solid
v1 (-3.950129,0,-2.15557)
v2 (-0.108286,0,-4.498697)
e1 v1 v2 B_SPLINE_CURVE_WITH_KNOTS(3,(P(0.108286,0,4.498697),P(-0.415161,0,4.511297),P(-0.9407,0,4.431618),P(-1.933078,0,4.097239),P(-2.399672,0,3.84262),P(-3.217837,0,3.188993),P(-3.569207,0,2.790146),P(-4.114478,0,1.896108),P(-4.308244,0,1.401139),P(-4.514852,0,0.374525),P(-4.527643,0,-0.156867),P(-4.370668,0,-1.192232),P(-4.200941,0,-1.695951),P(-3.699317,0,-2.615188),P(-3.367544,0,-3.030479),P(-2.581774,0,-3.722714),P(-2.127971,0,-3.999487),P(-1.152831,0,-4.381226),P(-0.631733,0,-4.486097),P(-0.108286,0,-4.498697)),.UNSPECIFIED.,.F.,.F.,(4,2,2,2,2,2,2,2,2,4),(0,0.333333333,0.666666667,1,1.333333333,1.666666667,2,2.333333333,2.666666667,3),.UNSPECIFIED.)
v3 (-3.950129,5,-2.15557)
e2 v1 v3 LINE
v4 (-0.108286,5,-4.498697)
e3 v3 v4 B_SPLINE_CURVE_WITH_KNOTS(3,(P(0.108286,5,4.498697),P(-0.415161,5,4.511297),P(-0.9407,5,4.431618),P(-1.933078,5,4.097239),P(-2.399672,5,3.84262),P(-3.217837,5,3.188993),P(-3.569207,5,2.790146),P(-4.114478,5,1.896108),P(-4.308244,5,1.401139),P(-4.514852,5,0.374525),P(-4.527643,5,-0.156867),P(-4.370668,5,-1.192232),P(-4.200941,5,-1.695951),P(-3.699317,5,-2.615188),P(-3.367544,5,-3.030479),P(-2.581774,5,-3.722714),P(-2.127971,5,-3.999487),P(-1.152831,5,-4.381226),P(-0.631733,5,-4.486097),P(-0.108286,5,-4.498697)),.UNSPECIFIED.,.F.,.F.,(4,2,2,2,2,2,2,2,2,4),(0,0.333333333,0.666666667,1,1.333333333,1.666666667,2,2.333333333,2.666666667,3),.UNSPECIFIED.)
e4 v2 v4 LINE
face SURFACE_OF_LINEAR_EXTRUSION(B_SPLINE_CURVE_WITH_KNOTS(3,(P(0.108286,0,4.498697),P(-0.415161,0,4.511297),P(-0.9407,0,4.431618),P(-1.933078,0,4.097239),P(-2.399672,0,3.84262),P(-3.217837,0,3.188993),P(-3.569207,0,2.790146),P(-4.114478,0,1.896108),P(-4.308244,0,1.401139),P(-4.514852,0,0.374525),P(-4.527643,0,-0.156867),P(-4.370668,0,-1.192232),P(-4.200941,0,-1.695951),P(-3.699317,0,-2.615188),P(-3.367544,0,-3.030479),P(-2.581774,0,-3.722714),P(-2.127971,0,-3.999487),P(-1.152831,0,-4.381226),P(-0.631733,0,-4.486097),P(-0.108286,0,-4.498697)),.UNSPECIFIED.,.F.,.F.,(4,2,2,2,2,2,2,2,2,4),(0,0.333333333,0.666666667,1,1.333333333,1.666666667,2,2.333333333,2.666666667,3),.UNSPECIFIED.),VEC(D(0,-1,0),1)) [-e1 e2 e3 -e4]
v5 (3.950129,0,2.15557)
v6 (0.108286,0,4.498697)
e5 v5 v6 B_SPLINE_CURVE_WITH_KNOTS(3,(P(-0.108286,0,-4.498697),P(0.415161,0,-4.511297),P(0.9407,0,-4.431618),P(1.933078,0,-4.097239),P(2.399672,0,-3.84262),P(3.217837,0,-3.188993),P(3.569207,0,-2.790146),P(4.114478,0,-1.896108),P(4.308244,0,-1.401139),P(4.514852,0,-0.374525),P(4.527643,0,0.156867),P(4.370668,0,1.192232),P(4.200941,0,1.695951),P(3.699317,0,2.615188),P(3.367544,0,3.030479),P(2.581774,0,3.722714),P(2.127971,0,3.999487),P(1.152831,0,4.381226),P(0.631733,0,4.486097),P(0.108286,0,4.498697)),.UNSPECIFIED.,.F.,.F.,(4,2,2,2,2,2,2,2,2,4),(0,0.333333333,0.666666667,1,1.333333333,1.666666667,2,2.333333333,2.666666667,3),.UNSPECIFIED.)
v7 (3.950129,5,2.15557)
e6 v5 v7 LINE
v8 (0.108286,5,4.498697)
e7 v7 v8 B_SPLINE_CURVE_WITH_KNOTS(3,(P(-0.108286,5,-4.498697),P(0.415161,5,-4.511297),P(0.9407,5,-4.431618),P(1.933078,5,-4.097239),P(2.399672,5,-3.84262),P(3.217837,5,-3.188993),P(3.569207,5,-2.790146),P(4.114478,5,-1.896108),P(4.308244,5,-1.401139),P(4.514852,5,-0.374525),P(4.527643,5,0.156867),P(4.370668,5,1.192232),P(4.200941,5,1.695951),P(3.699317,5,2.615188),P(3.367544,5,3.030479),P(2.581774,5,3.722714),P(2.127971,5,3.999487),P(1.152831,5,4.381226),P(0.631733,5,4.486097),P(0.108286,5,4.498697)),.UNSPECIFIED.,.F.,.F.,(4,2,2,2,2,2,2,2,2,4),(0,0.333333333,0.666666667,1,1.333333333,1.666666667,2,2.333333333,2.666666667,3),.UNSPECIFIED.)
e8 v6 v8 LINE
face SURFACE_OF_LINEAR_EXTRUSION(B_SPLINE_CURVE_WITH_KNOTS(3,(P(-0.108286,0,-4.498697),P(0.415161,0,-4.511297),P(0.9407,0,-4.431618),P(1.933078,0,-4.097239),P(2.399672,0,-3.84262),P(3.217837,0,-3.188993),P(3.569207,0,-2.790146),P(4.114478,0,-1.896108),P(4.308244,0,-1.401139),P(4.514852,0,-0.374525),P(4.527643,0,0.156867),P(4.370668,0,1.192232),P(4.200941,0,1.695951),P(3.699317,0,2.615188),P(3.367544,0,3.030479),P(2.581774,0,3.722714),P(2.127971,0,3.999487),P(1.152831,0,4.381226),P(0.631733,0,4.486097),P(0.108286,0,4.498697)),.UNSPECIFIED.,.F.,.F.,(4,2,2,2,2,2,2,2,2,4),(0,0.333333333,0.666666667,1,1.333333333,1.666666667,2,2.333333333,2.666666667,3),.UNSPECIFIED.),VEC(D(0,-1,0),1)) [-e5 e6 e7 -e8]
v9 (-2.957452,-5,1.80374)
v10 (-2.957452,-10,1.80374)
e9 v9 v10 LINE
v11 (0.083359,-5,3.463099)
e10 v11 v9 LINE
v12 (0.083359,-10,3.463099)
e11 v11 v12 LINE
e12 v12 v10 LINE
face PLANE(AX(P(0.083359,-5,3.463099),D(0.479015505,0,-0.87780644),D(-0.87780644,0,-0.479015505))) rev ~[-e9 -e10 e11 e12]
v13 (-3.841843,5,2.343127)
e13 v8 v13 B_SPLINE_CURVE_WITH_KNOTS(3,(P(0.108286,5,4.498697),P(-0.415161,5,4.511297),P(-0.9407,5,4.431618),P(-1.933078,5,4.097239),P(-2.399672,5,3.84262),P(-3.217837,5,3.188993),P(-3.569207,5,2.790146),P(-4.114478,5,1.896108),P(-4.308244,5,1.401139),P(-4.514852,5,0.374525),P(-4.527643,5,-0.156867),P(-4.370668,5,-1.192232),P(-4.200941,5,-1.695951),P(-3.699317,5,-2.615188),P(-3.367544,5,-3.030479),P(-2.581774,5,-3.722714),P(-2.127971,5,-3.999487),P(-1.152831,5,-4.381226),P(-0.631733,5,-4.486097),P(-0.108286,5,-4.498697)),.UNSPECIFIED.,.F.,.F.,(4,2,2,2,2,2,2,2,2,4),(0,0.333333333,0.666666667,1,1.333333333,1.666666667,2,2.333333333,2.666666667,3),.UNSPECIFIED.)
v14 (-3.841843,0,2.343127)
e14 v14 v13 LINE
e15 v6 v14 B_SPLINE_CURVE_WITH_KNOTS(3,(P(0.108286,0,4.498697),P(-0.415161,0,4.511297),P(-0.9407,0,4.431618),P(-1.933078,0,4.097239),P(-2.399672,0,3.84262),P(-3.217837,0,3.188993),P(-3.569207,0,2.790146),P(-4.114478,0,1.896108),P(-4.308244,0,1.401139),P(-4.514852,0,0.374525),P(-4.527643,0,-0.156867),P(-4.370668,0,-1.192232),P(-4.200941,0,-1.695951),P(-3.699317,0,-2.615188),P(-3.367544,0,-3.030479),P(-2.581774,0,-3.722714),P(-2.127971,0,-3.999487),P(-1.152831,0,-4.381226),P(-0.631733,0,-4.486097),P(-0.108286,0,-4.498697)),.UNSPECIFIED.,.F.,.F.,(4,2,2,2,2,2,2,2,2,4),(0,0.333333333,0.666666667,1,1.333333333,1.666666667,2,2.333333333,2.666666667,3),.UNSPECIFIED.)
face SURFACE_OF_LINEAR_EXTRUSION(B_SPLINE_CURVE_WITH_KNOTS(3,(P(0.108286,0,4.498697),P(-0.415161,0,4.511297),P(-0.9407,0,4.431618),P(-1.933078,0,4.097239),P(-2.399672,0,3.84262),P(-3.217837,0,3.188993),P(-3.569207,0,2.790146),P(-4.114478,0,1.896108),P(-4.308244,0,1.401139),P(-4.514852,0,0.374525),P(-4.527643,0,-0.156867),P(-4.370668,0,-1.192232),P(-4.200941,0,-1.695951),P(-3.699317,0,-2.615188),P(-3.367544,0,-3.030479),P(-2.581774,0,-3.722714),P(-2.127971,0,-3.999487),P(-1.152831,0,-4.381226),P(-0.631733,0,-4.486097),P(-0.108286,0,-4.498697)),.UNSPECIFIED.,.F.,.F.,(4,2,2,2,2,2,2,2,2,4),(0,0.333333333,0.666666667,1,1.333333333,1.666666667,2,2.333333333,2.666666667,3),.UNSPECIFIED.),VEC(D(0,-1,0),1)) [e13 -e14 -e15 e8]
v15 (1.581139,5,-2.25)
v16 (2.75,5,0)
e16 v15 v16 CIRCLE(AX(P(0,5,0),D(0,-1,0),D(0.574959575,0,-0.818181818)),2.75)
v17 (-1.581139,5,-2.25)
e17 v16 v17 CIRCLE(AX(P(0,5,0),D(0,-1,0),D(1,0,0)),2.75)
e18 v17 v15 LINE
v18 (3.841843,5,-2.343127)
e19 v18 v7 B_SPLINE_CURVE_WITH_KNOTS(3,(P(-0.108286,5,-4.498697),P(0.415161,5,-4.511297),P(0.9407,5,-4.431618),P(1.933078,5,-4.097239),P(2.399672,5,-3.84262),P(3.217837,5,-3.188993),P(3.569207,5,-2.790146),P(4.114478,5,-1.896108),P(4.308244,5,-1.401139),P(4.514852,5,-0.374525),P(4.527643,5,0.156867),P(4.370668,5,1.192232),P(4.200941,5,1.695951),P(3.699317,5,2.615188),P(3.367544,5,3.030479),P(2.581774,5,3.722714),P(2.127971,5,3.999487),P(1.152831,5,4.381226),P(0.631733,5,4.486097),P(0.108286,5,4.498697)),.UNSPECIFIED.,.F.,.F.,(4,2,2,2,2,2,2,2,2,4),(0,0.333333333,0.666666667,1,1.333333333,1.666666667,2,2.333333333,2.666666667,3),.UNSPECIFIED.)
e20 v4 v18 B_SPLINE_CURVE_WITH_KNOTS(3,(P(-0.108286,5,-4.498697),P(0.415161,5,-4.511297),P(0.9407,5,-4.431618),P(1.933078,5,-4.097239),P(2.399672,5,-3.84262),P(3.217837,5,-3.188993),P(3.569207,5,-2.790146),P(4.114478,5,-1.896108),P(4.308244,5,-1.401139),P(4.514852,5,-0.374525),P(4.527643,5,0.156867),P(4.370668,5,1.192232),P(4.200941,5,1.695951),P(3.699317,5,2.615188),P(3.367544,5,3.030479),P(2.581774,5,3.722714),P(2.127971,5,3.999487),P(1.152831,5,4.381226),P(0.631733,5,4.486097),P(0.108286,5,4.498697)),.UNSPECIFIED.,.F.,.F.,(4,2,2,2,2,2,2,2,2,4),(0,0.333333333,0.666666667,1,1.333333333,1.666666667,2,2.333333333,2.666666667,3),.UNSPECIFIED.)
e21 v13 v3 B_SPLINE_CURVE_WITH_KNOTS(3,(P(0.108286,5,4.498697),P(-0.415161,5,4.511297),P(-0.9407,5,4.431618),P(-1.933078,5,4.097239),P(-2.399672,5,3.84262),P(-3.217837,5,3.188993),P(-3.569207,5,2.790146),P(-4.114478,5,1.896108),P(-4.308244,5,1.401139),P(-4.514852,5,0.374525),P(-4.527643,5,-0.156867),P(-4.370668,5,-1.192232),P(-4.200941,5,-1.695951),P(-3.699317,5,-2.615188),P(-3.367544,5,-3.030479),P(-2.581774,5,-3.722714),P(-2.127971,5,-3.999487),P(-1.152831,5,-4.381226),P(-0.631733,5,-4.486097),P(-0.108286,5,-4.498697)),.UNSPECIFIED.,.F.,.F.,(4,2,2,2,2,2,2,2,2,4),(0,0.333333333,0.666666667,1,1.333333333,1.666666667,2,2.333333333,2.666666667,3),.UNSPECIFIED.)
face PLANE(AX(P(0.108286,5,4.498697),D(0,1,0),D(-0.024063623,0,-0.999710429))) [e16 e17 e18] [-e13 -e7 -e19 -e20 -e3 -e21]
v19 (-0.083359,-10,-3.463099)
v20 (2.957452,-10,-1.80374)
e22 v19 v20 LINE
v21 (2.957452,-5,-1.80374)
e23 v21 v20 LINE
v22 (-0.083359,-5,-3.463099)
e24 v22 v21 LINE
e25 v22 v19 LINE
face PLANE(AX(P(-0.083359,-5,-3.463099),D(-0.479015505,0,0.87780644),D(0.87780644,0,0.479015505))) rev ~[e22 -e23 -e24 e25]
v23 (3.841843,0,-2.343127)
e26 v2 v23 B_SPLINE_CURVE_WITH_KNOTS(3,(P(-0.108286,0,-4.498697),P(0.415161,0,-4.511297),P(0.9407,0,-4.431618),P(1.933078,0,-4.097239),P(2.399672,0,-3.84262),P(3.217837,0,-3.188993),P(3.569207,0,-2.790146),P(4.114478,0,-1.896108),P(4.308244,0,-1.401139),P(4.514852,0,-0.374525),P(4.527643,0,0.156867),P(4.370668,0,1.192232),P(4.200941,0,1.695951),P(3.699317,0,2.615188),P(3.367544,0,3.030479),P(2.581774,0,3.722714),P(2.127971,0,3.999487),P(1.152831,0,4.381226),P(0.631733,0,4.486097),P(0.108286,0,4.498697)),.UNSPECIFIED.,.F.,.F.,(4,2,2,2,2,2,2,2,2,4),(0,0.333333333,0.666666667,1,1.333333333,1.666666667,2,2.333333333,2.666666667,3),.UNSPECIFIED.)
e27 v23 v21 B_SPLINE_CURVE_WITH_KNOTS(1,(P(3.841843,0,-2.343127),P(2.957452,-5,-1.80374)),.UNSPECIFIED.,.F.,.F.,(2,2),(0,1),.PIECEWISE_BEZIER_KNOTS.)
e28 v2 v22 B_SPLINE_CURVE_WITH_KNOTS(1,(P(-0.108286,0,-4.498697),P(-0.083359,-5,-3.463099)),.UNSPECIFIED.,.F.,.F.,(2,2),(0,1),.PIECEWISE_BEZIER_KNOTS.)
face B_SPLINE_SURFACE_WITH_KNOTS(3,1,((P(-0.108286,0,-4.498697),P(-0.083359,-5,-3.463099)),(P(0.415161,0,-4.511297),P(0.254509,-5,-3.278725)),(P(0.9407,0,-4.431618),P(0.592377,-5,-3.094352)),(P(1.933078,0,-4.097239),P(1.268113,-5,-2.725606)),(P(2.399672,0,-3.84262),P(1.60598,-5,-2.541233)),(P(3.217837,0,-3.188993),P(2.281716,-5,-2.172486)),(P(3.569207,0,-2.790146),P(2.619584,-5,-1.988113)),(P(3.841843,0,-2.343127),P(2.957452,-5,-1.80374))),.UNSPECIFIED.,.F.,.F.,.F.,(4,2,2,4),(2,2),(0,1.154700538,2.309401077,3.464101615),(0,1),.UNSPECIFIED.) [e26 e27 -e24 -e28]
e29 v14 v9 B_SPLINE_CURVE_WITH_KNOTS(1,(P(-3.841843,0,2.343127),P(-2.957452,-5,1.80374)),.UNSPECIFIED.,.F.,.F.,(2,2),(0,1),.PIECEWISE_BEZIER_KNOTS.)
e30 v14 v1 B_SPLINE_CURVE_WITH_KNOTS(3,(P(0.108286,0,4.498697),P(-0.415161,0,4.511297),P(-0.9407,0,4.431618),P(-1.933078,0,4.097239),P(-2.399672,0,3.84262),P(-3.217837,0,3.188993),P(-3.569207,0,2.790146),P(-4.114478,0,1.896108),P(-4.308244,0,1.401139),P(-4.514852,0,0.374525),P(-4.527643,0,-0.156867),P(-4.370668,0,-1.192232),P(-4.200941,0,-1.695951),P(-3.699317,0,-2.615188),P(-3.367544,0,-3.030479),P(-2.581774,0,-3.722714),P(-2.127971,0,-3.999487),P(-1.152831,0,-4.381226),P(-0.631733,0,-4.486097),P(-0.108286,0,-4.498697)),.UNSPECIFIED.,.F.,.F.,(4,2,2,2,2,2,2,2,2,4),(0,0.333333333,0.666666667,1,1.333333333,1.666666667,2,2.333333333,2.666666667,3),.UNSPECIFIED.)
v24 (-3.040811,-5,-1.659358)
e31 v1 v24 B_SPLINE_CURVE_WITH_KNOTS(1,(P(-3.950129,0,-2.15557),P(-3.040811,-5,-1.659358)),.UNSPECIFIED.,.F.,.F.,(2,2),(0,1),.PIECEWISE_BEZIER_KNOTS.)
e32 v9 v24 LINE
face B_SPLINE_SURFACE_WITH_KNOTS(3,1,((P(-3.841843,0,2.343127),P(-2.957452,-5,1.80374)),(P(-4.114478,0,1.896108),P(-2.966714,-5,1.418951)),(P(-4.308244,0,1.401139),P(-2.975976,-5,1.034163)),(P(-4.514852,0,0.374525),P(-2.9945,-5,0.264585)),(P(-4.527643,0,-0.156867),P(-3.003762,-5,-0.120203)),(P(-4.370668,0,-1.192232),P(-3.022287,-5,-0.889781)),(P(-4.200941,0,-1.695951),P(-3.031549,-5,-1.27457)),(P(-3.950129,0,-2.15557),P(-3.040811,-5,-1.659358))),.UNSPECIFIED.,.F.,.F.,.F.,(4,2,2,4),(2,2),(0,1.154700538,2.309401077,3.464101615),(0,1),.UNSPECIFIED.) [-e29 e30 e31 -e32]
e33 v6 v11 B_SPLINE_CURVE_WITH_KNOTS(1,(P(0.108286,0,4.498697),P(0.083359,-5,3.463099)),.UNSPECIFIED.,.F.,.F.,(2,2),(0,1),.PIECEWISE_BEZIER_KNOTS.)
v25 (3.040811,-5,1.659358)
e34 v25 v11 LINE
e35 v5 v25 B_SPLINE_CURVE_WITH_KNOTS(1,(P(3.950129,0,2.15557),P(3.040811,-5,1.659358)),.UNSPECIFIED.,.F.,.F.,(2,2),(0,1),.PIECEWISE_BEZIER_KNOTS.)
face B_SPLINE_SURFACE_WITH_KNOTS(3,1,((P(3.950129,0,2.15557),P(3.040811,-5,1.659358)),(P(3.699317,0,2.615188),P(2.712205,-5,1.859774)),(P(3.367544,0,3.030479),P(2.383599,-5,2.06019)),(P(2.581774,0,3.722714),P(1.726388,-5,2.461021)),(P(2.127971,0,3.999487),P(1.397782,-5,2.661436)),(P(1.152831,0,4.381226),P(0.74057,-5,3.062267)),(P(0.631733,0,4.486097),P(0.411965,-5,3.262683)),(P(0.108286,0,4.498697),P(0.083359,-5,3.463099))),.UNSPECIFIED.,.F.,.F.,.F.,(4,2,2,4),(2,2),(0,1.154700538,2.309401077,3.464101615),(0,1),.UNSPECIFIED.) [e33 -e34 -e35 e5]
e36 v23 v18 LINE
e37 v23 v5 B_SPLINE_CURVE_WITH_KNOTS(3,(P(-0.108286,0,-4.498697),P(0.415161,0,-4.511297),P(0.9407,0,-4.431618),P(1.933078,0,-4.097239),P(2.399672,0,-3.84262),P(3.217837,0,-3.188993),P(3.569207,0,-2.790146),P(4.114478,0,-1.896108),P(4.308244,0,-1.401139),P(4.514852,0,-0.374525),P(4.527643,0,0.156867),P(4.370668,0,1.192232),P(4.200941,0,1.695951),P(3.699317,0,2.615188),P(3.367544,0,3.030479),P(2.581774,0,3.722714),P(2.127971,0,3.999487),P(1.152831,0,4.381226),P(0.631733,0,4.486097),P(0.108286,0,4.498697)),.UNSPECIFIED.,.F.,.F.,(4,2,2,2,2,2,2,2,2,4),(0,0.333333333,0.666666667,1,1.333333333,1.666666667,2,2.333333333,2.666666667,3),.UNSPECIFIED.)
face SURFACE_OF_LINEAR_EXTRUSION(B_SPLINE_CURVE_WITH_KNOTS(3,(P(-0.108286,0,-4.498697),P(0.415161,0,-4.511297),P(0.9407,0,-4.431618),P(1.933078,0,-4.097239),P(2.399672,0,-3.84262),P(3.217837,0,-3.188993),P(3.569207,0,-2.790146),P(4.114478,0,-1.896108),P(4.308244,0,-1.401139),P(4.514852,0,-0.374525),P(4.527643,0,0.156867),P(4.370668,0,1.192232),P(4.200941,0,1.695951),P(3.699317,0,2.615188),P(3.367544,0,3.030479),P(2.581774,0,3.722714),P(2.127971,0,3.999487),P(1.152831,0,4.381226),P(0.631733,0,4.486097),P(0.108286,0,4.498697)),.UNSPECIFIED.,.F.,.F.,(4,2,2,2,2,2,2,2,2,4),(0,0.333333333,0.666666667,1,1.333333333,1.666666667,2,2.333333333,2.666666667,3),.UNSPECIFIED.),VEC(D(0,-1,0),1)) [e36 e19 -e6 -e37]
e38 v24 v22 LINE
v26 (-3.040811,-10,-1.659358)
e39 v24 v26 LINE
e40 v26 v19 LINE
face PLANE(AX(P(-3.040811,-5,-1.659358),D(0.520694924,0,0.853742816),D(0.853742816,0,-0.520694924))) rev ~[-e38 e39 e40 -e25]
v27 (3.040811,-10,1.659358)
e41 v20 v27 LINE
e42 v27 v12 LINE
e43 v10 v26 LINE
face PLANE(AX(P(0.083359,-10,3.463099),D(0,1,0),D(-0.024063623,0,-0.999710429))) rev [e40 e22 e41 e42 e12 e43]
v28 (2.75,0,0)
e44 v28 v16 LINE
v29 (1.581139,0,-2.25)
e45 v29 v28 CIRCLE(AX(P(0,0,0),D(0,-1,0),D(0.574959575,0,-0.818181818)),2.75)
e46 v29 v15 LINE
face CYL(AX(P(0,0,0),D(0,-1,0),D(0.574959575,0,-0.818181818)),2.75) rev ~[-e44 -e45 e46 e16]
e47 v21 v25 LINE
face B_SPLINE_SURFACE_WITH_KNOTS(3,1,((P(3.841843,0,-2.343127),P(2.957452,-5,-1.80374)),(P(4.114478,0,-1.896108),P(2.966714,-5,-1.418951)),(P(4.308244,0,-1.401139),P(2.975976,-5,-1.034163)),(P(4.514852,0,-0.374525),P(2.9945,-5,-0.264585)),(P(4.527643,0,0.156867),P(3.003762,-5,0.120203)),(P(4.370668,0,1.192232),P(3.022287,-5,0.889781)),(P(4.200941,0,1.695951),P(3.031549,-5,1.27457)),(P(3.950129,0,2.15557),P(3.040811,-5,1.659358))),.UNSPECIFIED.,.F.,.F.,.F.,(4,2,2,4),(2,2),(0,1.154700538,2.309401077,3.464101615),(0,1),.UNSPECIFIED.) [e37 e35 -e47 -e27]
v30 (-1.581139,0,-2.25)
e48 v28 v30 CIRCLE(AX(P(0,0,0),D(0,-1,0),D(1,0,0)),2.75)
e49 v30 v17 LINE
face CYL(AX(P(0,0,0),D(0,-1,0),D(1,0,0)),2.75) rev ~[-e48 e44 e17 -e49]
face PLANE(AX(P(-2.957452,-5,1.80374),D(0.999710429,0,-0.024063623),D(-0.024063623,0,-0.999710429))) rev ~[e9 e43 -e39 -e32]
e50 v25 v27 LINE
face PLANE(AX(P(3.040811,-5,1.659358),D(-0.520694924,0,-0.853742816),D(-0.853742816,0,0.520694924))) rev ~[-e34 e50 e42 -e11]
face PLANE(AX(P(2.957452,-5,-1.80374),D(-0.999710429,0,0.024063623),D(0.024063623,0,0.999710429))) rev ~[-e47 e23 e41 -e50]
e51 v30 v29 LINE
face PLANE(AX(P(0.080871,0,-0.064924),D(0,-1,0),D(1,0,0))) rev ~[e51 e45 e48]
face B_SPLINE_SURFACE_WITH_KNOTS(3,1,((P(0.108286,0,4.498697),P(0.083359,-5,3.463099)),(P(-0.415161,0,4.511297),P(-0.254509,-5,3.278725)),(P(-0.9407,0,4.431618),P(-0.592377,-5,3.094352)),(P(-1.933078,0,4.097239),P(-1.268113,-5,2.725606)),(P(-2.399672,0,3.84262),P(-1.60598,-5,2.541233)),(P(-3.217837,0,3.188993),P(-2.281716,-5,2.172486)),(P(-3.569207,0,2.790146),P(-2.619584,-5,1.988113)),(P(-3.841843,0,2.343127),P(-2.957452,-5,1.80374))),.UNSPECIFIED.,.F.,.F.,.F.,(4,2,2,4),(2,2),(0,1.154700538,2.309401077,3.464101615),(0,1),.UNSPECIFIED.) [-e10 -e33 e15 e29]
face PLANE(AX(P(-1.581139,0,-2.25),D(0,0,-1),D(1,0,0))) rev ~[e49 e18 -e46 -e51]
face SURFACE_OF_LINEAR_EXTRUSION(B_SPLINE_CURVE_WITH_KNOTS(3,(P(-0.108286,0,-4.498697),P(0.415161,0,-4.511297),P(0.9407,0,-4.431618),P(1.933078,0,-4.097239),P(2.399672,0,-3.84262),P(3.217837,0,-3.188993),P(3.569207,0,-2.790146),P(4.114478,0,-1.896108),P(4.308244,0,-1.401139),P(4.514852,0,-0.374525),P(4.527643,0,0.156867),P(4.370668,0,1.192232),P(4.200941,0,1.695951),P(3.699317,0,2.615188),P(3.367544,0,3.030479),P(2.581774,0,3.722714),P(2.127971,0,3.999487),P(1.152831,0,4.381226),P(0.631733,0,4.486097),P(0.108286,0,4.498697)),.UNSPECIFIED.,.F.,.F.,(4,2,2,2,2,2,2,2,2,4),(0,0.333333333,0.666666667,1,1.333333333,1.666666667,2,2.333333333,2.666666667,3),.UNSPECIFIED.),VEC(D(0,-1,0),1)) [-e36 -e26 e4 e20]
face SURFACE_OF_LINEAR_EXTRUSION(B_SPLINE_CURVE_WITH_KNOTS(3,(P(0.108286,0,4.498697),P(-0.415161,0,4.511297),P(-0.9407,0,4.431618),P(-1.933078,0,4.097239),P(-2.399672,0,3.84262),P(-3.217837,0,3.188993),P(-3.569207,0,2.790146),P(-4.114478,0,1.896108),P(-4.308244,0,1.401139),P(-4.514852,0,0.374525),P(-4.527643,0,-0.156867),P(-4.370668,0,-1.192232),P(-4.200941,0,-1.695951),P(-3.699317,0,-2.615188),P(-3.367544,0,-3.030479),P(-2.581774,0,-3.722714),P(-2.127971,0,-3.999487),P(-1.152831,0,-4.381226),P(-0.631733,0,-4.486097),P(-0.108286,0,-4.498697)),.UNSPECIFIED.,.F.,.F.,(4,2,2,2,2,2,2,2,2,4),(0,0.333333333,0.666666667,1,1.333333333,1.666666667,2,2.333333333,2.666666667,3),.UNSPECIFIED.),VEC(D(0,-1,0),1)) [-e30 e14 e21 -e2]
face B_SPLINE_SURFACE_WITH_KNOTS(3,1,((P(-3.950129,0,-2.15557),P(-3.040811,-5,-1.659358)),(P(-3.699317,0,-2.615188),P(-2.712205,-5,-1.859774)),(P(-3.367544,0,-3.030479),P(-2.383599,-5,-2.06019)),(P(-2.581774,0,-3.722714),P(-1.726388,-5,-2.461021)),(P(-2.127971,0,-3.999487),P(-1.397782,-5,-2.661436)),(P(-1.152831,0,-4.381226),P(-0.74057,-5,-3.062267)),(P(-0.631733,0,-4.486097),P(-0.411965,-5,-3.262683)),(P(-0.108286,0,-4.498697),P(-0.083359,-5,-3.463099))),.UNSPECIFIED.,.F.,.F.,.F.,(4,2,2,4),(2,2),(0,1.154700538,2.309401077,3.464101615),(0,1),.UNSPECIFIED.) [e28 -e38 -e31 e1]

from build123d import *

# Parameters (mm, degrees)
F4_DEPTH = 5
F5_DEPTH = 5
F7_DEPTH = 5


# Not quite as in the source:
# - the arcs of a loft's sections are written as splines that run evenly, so that the points pair up as in the source's solid


with BuildPart() as f3:
    # F0 (on Front) → F3 section 0
    with BuildSketch(Plane.XZ):
        with BuildLine():
            add(Edge.make_bspline(
                [(3.8418426736, -2.3431271565), (4.1144778981, -1.8961084632), (4.3082439854, -1.4011386227), (4.5148518075, -0.3745248107), (4.5276427142, 0.1568666009), (4.3706679569, 1.1922320614), (4.2009409107, 1.6959513974), (3.9501289786, 2.1555697744)],
                knots=[0, 0, 0, 0, 0.3333333333, 0.3333333333, 0.6666666667, 0.6666666667, 1, 1, 1, 1], degree=3))
            add(Edge.make_bspline(
                [(3.9501289786, 2.1555697744), (3.6993170465, 2.6151881514), (3.3675436342, 3.0304794257), (2.5817739042, 3.7227139543), (2.1279708957, 3.9994869102), (1.1528307261, 4.3812255129), (0.6317334617, 4.4860972472), (0.1082863051, 4.4986969309)],
                knots=[0, 0, 0, 0, 0.3333333333, 0.3333333333, 0.6666666667, 0.6666666667, 1, 1, 1, 1], degree=3))
            add(Edge.make_bspline(
                [(0.1082863051, 4.4986969309), (-0.4151608516, 4.5112966146), (-0.9407003512, 4.4316180484), (-1.9330779034, 4.097238765), (-2.3996718185, 3.8426203093), (-3.2178372309, 3.1889934515), (-3.5692074491, 2.7901458498), (-3.8418426736, 2.3431271565)],
                knots=[0, 0, 0, 0, 0.3333333333, 0.3333333333, 0.6666666667, 0.6666666667, 1, 1, 1, 1], degree=3))
            add(Edge.make_bspline(
                [(-3.8418426736, 2.3431271565), (-4.1144778981, 1.8961084632), (-4.3082439854, 1.4011386227), (-4.5148518075, 0.3745248107), (-4.5276427142, -0.1568666009), (-4.3706679569, -1.1922320614), (-4.2009409107, -1.6959513974), (-3.9501289786, -2.1555697744)],
                knots=[0, 0, 0, 0, 0.3333333333, 0.3333333333, 0.6666666667, 0.6666666667, 1, 1, 1, 1], degree=3))
            add(Edge.make_bspline(
                [(-3.9501289786, -2.1555697744), (-3.6993170465, -2.6151881514), (-3.3675436342, -3.0304794257), (-2.5817739042, -3.7227139543), (-2.1279708957, -3.9994869102), (-1.1528307261, -4.3812255129), (-0.6317334617, -4.4860972472), (-0.1082863051, -4.4986969309)],
                knots=[0, 0, 0, 0, 0.3333333333, 0.3333333333, 0.6666666667, 0.6666666667, 1, 1, 1, 1], degree=3))
            add(Edge.make_bspline(
                [(-0.1082863051, -4.4986969309), (0.4151608516, -4.5112966146), (0.9407003512, -4.4316180484), (1.9330779034, -4.097238765), (2.3996718185, -3.8426203093), (3.2178372309, -3.1889934515), (3.5692074491, -2.7901458498), (3.8418426736, -2.3431271565)],
                knots=[0, 0, 0, 0, 0.3333333333, 0.3333333333, 0.6666666667, 0.6666666667, 1, 1, 1, 1], degree=3))
        make_face()
    # F2 (on offset) → F3 section 1
    with BuildSketch(Plane.XZ.offset(5)):
        Polygon((2.957451869, -1.8037401261), (3.0408107055, 1.659358386), (0.0833588365, 3.4630985121), (-2.957451869, 1.8037401261), (-3.0408107055, -1.659358386), (-0.0833588365, -3.4630985121), align=None)
    loft(ruled=True)

    # F4 (add): a face of the model
    f4_faces = [f3.faces().sort_by_distance(p)[0] for p in [
        (0, 0, 0),
    ]]
    extrude(f4_faces, amount=F4_DEPTH)

    # F5 (add): a face of the model
    f5_faces = [f3.faces().sort_by_distance(p)[0] for p in [
        (0, -5, 0),
    ]]
    extrude(f5_faces, amount=F5_DEPTH)

    # F6 (on Front) → F7 (cut)
    with BuildSketch(Plane.XZ):
        with BuildLine():
            ThreePointArc((1.5811388301, -2.25), (2.4403515918, -1.2677476518), (2.75, 0))
            ThreePointArc((2.75, 0), (-1.2677476518, 2.4403515918), (-1.5811388301, -2.25))
            Line((-1.5811388301, -2.25), (1.5811388301, -2.25))
        make_face()
    extrude(amount=-F7_DEPTH, mode=Mode.SUBTRACT)


solid = f3.part
